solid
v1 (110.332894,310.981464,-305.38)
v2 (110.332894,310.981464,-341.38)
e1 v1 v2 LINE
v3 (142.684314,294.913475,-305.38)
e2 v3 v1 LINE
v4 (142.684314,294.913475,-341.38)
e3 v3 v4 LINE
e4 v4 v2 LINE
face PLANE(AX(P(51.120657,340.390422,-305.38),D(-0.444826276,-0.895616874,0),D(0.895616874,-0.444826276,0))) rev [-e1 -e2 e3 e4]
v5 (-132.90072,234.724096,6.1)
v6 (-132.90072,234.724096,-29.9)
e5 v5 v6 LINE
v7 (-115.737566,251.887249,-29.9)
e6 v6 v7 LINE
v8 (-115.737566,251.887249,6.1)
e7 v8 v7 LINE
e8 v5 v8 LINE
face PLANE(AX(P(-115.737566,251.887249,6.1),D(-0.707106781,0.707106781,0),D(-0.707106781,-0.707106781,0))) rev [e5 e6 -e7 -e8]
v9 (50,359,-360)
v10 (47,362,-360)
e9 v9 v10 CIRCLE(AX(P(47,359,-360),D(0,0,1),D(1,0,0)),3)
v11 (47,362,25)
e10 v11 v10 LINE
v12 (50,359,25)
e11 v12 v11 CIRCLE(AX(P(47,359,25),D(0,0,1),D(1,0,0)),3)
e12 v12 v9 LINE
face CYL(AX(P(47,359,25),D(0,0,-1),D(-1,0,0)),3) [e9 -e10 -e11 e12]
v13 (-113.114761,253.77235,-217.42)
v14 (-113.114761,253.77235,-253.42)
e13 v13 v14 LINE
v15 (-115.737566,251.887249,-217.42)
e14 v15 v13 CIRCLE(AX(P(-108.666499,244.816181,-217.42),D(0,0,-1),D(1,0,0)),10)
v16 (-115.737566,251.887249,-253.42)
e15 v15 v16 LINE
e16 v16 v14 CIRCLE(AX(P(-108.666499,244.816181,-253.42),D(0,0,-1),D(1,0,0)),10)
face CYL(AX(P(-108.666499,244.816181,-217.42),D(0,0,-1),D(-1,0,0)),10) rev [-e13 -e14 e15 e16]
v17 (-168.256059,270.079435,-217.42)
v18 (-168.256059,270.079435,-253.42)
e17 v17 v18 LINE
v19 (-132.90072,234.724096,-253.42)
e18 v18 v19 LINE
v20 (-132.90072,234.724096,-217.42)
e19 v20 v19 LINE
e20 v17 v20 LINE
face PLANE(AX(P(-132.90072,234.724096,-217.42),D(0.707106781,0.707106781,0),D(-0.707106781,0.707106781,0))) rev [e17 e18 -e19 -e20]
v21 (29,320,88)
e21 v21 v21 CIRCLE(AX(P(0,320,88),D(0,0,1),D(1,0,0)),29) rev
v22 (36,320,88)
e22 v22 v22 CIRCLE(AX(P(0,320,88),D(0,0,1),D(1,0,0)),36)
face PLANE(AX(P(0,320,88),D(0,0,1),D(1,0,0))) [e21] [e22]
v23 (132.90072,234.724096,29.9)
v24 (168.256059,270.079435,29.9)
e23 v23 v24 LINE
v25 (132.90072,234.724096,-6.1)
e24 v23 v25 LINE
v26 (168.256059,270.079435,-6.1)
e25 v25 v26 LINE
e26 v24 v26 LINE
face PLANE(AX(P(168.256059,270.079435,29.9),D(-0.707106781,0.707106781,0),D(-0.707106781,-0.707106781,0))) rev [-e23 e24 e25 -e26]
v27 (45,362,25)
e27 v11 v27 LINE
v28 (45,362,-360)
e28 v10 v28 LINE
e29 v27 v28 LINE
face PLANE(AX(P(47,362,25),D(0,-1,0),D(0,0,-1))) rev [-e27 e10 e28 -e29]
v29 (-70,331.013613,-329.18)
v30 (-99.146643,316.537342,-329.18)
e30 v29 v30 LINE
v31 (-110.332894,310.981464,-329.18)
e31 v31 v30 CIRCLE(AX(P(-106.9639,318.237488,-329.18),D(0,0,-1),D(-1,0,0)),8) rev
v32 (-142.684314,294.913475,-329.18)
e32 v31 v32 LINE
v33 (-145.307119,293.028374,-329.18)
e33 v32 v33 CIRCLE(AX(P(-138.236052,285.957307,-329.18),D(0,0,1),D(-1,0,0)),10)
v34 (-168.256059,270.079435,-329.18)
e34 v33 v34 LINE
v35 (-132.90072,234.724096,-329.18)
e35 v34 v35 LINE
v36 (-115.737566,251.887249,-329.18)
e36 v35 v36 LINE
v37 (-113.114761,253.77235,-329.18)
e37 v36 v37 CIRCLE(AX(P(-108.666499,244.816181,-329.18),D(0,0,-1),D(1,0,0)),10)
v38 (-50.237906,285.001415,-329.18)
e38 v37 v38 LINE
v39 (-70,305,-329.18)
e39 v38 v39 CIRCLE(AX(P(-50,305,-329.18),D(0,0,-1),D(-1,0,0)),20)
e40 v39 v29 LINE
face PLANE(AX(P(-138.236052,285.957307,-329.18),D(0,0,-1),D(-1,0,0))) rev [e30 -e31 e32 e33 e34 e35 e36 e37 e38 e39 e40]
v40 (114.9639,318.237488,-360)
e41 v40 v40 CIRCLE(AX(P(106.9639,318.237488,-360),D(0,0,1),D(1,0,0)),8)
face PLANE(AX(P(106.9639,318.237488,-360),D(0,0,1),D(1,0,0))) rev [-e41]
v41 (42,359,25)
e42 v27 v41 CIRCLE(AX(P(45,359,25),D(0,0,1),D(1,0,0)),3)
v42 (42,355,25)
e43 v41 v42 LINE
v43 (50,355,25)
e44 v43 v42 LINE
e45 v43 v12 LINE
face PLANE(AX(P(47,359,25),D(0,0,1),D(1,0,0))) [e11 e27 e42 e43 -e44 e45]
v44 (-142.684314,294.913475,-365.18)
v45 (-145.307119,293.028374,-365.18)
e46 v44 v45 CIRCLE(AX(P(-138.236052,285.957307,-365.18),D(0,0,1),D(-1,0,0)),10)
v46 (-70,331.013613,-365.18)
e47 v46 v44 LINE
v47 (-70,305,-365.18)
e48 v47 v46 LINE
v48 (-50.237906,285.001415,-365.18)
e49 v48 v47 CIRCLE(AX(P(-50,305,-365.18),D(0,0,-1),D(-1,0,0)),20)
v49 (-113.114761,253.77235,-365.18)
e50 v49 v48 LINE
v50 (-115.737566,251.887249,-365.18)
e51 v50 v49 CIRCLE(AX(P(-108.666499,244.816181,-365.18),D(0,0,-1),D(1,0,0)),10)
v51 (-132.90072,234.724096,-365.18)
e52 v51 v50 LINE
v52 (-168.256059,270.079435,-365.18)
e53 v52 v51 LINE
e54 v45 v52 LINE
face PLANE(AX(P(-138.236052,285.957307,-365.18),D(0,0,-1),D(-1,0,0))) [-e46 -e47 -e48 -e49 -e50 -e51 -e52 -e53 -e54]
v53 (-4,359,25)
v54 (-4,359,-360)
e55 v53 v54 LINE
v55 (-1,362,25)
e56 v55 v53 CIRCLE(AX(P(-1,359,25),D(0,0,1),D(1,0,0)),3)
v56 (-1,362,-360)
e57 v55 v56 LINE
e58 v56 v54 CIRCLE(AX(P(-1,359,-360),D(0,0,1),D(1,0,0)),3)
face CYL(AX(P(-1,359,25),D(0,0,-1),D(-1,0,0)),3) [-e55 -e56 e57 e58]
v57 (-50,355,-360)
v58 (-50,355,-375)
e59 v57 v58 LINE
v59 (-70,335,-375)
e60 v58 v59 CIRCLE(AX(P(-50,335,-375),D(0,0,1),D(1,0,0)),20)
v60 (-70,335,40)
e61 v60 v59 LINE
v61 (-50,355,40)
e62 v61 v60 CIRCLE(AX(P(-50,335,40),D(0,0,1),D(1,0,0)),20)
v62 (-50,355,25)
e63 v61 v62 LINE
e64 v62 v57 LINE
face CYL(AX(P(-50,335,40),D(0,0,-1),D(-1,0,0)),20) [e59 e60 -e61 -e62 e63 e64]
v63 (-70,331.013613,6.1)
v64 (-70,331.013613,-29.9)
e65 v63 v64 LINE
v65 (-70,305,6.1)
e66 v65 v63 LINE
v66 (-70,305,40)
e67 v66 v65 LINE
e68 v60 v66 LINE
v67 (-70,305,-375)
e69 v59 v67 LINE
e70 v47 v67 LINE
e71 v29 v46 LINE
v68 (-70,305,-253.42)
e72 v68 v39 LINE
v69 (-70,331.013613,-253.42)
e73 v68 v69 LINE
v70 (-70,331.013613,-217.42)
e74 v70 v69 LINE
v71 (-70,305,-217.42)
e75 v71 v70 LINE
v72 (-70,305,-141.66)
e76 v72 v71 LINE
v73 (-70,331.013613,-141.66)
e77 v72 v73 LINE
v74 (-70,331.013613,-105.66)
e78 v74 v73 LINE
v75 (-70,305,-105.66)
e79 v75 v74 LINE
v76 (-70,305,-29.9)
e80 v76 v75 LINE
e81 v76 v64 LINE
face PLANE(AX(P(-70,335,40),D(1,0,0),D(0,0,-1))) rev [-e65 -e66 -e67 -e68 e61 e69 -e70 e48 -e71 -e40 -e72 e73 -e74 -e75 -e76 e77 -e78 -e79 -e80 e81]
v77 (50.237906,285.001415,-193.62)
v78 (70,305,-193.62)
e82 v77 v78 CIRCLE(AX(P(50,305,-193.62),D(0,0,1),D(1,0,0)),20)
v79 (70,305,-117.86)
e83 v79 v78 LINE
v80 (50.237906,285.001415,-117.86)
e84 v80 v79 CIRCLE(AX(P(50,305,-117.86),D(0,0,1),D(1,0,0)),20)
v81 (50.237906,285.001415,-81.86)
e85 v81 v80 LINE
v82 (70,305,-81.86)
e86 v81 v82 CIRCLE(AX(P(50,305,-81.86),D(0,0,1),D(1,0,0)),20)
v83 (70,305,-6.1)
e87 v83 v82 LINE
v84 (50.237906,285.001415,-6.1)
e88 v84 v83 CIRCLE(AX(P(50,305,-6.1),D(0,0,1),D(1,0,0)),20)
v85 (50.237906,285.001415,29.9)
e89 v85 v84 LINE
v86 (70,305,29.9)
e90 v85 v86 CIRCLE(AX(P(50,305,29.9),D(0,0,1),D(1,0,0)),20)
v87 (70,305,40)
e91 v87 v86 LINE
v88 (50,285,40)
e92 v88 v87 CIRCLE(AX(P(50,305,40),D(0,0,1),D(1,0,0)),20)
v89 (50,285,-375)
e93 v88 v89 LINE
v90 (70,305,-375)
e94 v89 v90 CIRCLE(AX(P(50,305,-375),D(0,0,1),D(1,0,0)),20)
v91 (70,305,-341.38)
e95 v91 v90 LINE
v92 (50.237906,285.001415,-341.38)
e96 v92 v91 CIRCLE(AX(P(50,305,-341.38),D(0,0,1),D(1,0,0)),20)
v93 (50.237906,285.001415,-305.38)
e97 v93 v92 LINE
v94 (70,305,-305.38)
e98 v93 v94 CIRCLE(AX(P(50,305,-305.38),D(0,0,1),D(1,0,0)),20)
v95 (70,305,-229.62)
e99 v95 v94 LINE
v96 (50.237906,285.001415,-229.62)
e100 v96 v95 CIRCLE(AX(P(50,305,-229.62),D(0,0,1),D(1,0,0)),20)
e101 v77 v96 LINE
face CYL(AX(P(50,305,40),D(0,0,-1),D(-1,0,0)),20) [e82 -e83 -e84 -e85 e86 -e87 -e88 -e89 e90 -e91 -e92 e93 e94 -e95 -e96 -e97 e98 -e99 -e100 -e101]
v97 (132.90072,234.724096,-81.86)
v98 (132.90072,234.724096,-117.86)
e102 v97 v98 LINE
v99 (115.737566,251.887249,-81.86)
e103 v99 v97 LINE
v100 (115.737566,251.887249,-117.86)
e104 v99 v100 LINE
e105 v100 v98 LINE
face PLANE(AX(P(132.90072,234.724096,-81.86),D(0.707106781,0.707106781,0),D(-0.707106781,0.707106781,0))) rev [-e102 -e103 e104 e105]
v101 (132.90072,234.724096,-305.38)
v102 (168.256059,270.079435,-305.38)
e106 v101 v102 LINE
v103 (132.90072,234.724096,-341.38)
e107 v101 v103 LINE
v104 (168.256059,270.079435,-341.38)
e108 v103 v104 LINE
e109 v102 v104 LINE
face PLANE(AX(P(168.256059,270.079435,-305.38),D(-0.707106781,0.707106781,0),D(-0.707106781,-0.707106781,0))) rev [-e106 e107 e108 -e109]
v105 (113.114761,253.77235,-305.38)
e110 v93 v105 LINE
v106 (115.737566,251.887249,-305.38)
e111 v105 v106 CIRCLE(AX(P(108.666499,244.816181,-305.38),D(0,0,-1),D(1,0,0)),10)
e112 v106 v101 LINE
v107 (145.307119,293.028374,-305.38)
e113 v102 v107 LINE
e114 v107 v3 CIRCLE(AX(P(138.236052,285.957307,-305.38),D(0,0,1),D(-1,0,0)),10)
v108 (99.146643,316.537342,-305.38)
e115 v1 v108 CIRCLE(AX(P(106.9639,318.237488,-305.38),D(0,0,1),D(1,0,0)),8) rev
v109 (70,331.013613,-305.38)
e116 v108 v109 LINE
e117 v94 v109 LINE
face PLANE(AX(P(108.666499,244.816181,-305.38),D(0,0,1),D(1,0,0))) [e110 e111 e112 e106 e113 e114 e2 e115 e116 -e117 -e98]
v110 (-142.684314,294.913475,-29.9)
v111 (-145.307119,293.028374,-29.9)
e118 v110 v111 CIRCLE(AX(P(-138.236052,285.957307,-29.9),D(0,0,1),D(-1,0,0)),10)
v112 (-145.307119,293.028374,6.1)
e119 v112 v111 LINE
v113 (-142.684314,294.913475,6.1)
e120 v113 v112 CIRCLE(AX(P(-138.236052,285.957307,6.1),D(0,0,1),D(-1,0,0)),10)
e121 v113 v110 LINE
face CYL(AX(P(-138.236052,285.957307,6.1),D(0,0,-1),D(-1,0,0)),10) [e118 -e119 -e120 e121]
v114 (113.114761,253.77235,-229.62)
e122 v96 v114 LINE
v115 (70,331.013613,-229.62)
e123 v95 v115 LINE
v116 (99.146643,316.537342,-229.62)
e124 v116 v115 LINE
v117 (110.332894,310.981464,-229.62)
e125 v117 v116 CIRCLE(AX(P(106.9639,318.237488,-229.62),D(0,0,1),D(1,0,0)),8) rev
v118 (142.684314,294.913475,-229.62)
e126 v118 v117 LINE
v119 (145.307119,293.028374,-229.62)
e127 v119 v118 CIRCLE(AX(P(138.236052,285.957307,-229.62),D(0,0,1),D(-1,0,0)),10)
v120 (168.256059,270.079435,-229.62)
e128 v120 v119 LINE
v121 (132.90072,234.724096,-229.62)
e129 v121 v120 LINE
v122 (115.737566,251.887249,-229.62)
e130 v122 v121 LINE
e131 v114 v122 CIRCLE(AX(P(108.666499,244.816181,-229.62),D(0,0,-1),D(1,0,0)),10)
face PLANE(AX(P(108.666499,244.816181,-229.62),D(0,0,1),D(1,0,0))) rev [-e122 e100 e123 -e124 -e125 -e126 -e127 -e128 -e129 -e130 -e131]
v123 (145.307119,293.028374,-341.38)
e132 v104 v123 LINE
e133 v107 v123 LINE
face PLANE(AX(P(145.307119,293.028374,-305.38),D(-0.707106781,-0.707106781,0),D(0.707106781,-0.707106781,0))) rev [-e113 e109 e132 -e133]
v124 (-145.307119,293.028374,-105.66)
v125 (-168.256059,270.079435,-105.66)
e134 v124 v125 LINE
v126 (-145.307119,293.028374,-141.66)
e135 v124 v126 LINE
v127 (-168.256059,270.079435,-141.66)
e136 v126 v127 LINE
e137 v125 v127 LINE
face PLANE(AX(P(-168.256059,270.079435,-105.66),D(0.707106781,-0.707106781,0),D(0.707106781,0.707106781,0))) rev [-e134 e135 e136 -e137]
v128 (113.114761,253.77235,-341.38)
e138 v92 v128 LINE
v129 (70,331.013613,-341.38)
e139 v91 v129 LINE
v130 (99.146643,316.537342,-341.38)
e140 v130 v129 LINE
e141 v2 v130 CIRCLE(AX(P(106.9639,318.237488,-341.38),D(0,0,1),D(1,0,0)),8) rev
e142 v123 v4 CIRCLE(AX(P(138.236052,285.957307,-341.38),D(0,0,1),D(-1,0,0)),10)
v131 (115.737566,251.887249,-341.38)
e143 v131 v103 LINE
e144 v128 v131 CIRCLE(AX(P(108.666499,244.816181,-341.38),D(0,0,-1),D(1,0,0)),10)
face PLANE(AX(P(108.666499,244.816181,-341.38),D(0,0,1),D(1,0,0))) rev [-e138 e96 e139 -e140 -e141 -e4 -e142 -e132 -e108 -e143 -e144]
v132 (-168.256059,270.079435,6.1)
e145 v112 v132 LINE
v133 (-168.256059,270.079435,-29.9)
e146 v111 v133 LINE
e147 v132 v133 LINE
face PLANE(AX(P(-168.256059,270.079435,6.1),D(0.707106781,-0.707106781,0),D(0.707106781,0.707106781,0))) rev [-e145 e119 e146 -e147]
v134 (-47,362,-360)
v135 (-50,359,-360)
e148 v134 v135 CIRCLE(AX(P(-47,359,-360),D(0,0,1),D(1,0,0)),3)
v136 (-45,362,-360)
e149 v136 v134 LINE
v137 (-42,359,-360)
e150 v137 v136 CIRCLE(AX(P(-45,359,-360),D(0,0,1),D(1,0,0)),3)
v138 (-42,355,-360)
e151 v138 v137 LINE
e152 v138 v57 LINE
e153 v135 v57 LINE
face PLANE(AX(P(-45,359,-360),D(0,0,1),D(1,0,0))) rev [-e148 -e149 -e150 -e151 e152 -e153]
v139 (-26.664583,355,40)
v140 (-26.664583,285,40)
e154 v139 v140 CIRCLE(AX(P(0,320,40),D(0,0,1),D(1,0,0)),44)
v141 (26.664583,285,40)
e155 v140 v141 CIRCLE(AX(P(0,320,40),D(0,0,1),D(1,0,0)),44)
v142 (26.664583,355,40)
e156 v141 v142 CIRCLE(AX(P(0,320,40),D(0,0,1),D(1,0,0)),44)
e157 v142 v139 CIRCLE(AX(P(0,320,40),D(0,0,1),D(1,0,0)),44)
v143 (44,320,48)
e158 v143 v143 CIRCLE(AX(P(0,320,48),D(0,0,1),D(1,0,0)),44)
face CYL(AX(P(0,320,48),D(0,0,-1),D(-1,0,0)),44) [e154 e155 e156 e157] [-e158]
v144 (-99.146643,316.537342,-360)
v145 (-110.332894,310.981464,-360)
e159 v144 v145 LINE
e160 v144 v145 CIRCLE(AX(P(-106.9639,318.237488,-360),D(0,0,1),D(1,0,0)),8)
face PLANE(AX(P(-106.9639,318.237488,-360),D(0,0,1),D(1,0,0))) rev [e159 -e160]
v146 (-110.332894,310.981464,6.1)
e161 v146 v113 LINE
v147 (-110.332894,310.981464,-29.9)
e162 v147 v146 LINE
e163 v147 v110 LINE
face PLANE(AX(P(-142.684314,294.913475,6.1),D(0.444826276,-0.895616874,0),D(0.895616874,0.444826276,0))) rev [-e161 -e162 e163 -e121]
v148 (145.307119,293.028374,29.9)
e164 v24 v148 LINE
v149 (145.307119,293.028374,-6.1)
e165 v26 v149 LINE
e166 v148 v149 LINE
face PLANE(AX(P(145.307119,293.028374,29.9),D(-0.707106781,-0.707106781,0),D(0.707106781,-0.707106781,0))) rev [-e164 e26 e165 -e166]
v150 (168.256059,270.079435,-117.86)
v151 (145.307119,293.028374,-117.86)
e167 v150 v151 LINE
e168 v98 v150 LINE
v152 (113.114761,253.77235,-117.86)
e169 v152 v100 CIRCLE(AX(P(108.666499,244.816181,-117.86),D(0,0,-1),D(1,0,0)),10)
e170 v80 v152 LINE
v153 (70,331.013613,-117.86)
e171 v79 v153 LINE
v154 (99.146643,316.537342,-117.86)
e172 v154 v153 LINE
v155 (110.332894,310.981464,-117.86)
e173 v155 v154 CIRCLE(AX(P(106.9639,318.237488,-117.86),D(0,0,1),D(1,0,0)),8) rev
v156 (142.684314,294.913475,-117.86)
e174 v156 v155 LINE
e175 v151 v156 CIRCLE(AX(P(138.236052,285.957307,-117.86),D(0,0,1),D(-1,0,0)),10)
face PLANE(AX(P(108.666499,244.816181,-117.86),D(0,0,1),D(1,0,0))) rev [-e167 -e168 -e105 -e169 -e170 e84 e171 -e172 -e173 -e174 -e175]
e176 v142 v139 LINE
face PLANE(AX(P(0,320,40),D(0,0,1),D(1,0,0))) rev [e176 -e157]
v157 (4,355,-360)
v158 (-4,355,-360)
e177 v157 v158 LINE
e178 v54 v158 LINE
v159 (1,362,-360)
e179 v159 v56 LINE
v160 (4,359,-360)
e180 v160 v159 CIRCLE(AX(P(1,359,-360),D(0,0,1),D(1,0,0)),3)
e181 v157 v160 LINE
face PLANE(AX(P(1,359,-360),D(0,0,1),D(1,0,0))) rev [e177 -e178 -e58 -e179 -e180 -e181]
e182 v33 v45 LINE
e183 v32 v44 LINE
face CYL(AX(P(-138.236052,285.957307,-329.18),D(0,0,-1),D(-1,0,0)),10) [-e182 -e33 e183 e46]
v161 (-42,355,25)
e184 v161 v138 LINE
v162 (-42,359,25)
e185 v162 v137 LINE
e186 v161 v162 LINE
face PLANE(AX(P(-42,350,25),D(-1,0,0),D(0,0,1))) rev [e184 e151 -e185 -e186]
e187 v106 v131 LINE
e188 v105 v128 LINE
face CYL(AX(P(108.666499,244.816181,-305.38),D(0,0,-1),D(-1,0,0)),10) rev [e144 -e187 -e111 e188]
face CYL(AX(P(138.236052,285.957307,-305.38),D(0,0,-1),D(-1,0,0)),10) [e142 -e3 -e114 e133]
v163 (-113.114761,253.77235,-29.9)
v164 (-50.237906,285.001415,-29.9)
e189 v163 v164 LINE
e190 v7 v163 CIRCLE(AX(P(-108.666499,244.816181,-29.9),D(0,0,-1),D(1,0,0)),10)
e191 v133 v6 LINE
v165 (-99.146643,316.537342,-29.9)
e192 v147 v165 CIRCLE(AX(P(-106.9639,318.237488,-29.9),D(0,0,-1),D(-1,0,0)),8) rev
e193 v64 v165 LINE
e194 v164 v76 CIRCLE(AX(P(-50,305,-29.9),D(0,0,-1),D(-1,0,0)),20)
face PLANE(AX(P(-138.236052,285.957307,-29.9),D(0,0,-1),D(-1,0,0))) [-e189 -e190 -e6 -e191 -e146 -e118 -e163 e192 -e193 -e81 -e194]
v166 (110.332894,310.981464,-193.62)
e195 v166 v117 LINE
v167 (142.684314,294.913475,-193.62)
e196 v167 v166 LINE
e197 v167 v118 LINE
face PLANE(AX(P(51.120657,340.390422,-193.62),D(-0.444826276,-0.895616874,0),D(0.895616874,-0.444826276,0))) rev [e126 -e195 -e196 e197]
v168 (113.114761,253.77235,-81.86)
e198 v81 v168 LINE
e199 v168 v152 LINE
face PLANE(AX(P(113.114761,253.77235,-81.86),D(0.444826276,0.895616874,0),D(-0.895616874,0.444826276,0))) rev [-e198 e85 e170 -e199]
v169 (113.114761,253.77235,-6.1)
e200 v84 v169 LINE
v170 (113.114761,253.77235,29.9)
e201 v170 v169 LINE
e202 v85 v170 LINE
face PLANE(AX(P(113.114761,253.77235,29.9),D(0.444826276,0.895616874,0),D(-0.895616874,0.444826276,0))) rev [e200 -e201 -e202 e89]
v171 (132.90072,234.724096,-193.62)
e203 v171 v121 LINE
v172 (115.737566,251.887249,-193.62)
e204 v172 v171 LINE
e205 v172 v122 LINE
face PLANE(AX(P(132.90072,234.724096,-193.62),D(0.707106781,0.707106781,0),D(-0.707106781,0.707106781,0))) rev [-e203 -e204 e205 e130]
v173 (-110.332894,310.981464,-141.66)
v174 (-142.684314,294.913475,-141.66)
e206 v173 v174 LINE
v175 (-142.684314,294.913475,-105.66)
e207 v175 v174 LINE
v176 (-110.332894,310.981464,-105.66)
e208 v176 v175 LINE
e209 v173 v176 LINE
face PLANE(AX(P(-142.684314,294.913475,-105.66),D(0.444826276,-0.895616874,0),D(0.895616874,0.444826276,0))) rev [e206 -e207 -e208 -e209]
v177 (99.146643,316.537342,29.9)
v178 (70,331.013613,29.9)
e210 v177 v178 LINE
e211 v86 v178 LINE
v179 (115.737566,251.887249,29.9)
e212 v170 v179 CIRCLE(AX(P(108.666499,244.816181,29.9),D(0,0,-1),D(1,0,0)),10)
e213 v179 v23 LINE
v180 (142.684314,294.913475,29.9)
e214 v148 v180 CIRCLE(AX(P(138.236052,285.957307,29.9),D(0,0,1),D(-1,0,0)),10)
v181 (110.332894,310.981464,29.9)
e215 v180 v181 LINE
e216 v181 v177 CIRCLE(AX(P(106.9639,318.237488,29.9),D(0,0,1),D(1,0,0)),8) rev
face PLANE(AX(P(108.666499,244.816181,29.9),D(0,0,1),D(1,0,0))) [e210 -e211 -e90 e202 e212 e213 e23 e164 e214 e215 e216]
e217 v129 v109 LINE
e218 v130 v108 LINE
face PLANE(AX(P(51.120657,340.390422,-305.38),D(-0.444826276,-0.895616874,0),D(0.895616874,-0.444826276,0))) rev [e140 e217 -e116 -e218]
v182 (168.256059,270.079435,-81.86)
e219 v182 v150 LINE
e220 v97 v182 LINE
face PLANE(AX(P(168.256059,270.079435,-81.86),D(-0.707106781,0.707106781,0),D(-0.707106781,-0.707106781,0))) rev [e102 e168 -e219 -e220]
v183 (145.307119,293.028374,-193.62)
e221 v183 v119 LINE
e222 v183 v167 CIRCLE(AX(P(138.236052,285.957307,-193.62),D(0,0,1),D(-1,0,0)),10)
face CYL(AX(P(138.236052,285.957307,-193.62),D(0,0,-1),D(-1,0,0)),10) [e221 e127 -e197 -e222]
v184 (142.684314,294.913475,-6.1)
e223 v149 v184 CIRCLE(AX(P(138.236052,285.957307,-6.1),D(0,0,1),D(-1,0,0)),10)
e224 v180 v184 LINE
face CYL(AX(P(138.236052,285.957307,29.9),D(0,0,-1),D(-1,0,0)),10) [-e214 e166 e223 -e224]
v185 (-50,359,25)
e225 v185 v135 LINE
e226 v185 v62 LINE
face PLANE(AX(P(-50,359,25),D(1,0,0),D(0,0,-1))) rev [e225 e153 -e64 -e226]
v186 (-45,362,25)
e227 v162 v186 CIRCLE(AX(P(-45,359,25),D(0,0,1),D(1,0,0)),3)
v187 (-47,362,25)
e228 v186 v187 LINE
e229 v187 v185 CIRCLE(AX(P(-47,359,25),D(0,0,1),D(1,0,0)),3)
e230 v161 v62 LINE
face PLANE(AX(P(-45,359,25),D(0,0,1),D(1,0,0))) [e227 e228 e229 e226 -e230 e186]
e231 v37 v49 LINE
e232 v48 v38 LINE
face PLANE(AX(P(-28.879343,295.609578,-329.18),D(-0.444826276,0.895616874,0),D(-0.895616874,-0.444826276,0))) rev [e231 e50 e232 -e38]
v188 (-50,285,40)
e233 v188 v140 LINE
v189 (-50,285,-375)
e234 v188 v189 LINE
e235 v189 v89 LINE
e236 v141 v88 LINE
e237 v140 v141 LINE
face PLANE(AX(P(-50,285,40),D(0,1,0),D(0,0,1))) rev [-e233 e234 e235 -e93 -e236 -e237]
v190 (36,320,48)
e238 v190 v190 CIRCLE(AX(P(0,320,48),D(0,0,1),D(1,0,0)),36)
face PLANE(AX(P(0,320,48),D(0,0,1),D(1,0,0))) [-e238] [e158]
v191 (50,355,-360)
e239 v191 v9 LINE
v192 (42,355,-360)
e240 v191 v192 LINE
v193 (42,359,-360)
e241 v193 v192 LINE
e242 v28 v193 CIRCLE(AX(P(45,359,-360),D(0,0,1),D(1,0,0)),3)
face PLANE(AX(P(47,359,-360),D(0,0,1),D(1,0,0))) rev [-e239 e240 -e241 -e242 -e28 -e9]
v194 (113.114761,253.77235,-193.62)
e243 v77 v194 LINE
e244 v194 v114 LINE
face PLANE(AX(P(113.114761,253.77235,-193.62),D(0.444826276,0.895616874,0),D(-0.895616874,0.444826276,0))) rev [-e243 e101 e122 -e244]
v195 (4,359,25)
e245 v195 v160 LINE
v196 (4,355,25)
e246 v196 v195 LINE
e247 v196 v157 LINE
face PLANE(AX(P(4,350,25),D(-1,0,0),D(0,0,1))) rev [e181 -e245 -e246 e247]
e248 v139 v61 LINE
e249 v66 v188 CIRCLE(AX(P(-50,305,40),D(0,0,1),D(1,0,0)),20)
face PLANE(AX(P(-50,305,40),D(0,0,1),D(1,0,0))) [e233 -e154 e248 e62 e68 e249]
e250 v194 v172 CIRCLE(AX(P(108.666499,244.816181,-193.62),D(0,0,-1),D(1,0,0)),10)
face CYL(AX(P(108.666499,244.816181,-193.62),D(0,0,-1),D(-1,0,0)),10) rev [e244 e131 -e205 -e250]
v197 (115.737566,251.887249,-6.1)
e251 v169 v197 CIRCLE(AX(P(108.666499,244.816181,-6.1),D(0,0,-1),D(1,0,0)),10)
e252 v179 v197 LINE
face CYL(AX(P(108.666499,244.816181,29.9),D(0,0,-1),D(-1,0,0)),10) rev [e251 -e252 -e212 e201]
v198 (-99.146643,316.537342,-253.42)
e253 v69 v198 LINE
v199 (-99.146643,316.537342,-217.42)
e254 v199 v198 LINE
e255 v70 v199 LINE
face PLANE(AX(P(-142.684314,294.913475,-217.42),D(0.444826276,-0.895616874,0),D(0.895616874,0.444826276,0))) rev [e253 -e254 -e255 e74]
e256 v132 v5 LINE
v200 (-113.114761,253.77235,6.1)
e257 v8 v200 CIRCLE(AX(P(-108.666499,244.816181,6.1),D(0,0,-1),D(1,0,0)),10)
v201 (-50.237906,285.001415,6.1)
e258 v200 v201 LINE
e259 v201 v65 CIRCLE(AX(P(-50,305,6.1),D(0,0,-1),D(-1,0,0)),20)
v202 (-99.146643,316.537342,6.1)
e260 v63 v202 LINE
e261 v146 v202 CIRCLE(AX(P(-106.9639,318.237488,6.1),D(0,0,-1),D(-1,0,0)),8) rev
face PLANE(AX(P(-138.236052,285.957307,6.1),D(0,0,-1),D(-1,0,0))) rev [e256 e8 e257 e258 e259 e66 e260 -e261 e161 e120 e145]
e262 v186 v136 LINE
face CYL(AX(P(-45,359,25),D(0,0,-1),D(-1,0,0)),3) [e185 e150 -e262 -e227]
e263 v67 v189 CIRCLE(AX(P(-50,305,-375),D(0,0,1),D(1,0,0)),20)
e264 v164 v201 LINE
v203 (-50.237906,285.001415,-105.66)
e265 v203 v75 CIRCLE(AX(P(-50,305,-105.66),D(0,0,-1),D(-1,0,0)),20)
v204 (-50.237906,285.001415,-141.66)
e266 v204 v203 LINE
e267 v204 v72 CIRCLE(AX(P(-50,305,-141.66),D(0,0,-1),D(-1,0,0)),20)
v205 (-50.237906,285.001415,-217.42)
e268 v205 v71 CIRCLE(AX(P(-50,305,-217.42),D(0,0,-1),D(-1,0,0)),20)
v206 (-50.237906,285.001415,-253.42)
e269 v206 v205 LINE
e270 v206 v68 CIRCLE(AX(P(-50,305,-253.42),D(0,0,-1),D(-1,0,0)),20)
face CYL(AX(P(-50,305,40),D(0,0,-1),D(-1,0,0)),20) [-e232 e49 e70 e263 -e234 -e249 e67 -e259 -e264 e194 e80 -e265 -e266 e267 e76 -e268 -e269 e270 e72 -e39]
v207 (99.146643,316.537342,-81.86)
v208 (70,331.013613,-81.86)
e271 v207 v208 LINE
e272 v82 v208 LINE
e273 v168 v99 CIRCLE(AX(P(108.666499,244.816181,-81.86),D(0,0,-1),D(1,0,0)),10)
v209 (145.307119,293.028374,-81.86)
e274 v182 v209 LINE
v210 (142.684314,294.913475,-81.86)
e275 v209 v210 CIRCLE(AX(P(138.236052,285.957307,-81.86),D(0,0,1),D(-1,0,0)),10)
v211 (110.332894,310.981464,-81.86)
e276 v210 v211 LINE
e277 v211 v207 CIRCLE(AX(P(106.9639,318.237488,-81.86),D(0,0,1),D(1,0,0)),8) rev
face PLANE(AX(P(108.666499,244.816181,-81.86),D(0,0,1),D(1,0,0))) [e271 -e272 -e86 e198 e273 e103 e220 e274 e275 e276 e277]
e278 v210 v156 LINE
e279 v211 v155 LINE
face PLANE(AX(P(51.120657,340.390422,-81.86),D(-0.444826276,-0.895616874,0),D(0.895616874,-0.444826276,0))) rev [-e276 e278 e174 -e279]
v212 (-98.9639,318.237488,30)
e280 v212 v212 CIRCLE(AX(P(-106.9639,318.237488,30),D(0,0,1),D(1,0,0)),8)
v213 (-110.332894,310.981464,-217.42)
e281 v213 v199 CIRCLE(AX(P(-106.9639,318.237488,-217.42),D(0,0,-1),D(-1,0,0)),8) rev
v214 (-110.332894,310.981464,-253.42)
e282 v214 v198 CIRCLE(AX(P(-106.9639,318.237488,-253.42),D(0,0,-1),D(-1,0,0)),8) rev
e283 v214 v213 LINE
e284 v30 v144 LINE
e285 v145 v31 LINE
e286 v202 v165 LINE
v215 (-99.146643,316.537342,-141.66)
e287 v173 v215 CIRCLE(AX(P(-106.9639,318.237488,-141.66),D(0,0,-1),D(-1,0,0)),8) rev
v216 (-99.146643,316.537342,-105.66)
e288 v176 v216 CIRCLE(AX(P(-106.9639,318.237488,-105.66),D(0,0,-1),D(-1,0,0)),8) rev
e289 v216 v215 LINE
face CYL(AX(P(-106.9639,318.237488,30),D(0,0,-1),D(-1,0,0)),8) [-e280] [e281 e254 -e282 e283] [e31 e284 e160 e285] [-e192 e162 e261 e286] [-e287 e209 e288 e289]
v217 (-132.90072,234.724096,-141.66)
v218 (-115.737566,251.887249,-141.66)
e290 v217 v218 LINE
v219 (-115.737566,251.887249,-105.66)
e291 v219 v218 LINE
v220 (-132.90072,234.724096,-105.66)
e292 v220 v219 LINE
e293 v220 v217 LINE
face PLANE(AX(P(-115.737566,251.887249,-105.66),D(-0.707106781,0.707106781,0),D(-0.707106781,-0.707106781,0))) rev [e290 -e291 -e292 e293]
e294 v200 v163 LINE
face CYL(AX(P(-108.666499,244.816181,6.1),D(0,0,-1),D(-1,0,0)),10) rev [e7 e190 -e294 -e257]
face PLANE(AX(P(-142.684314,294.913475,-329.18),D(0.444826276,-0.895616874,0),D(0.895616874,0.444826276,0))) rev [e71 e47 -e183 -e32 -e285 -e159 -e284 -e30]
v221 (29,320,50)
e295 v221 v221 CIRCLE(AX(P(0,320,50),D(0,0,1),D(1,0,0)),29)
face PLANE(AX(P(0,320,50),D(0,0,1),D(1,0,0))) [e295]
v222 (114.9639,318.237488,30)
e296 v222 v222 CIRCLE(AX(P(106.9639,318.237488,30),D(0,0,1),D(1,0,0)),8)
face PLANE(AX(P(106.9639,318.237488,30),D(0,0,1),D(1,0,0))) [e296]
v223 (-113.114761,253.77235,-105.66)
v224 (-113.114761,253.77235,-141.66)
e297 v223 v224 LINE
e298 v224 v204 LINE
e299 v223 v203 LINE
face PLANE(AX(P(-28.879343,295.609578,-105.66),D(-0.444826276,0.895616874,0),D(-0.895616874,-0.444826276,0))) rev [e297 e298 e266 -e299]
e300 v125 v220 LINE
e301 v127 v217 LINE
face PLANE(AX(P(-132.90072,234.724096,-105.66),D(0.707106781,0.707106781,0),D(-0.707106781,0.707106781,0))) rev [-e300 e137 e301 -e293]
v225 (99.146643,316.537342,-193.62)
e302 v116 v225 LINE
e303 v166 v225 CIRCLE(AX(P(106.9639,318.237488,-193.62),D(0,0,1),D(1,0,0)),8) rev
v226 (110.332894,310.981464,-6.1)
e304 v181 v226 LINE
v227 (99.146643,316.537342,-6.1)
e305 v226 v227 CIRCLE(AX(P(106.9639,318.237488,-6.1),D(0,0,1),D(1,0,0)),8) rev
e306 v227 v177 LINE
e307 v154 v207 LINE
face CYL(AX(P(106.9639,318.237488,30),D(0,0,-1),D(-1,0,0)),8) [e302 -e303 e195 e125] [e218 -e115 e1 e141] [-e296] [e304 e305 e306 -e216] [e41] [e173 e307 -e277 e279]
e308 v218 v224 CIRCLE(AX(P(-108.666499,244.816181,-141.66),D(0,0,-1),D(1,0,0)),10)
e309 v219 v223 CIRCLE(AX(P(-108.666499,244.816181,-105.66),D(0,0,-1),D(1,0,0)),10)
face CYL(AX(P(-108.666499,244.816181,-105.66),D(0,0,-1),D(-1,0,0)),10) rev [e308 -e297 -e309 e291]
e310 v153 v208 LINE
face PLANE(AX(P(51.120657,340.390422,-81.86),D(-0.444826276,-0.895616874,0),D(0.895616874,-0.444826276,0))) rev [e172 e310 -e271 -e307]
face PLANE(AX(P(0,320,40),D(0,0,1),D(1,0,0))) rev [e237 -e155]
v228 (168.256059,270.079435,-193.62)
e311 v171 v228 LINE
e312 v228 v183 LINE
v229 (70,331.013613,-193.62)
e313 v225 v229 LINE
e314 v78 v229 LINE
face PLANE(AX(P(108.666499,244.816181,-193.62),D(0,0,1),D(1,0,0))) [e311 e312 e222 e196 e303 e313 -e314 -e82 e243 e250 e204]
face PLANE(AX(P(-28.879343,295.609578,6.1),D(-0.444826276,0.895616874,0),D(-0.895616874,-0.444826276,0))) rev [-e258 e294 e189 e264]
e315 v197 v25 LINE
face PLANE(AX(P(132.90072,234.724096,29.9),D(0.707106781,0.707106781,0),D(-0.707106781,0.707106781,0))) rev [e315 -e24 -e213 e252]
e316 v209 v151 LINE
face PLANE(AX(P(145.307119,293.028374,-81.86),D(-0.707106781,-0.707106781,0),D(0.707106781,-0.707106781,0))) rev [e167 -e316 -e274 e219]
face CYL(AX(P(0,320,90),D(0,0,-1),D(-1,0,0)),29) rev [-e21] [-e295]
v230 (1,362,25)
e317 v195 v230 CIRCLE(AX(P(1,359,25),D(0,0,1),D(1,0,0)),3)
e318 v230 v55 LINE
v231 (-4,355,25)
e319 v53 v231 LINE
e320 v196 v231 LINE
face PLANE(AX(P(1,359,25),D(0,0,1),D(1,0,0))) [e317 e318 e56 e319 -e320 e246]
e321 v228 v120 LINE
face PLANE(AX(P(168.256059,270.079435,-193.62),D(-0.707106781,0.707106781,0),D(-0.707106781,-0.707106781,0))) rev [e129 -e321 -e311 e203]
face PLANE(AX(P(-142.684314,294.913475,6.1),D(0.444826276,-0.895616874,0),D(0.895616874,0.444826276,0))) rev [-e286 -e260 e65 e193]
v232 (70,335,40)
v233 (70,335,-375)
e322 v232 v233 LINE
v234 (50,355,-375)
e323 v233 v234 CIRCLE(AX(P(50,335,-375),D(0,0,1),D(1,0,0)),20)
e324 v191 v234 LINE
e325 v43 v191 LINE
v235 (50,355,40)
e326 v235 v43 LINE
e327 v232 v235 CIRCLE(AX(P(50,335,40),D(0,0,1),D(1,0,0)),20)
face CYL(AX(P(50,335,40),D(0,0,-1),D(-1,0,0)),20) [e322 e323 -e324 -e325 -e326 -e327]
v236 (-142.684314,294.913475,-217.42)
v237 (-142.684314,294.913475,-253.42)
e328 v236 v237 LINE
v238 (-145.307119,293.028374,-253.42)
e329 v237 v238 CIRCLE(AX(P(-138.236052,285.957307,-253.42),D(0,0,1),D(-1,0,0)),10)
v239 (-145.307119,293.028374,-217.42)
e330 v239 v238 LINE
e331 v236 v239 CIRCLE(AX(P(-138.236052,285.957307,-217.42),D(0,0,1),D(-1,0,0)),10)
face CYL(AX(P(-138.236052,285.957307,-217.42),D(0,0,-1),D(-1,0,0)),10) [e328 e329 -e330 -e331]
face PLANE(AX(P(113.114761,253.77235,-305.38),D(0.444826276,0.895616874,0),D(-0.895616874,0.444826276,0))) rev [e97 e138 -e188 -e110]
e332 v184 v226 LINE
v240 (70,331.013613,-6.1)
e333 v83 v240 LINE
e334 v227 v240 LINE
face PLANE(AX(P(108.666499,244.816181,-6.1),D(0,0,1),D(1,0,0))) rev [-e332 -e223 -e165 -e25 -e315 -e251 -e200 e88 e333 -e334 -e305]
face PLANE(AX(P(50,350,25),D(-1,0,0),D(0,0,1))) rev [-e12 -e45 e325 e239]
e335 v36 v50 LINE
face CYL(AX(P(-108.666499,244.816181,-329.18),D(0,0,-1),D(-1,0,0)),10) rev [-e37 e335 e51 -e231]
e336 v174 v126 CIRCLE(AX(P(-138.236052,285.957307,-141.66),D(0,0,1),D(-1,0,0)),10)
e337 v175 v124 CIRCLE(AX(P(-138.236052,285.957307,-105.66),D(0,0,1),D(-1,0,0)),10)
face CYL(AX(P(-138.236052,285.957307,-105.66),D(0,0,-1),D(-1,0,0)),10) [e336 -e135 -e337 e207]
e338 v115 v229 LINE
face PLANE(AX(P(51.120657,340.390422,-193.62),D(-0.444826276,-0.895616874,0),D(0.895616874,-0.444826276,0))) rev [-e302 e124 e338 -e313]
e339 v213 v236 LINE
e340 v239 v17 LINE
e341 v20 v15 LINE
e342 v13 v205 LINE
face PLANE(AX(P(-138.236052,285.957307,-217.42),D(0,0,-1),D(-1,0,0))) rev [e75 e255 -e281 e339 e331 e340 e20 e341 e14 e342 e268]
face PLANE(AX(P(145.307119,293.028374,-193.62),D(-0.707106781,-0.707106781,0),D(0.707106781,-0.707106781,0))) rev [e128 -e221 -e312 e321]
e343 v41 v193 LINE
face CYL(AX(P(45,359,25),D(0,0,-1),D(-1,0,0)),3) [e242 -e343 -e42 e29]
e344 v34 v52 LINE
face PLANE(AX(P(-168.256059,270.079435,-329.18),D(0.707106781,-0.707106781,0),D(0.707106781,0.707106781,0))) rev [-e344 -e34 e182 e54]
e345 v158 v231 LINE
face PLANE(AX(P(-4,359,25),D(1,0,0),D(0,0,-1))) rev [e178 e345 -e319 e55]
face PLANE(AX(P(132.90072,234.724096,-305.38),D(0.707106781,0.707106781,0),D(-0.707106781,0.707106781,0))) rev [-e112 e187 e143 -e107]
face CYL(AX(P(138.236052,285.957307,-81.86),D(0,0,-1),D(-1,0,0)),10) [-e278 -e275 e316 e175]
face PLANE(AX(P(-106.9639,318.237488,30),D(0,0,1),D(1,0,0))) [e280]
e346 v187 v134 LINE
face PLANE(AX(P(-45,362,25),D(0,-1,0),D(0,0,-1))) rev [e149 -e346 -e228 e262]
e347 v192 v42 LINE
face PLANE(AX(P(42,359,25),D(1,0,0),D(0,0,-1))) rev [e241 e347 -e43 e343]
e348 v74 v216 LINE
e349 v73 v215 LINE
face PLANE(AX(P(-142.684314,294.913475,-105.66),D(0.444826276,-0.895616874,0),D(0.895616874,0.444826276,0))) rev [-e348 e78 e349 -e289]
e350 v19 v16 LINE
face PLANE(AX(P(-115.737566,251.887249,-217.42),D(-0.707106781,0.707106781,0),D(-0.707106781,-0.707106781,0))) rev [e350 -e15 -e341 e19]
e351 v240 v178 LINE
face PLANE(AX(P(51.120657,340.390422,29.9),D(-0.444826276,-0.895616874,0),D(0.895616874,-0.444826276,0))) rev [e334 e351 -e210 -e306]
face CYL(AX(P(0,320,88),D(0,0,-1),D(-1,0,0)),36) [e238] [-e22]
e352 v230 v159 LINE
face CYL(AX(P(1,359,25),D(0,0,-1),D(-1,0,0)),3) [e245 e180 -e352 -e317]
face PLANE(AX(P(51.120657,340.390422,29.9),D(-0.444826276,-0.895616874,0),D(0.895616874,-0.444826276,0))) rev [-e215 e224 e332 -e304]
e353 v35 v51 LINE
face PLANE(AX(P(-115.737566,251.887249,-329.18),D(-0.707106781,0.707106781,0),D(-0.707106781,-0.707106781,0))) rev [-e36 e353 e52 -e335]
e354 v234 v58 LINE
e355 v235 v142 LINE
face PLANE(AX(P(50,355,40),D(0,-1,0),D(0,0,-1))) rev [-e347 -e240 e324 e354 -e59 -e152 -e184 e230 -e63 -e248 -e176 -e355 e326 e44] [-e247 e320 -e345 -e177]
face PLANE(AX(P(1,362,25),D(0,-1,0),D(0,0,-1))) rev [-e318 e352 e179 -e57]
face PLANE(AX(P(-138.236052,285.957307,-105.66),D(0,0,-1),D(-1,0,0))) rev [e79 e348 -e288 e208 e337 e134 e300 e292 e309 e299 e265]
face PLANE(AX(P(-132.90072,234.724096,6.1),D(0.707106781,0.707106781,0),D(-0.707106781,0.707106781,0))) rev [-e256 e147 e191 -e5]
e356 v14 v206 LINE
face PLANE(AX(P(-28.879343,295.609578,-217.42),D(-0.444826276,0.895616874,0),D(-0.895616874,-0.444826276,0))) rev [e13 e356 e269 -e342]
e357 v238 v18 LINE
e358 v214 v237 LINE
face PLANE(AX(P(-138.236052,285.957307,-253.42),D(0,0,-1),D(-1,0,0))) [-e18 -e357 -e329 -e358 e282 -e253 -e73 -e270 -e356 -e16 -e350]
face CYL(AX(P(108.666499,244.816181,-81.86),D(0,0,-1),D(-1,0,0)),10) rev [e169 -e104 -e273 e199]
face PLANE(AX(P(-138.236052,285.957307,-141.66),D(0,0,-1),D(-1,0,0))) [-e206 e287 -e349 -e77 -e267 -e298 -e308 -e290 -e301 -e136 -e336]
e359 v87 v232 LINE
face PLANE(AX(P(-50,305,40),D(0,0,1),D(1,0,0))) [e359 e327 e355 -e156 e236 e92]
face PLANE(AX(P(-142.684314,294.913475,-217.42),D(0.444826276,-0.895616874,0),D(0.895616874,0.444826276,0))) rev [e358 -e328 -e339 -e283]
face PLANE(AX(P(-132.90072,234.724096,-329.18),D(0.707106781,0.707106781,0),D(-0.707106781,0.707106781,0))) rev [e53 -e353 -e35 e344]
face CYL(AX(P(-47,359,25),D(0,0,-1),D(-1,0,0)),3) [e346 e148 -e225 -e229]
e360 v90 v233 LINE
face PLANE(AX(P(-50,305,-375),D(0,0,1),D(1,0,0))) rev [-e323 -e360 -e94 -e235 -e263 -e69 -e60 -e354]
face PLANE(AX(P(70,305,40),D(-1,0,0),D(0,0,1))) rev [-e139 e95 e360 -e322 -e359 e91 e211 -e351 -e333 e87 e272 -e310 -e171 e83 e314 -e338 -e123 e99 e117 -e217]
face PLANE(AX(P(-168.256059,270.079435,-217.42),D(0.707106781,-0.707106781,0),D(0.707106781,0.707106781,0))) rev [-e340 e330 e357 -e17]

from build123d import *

# Parameters (mm, degrees)
PLENUM_START          = -375
PLENUM_DEPTH          = 415
PLENUM_START_2        = -360
PLENUM_RIBS_DEPTH     = 385
RUNNER_START          = -6.1
RUNNER_1_DEPTH        = 36
RUNNER_START_2        = -29.9
RUNNER_2_DEPTH        = 36
RUNNER_START_3        = -117.86
RUNNER_3_DEPTH        = 36
RUNNER_START_4        = -141.66
RUNNER_4_DEPTH        = 36
RUNNER_START_5        = -229.62
RUNNER_5_DEPTH        = 36
RUNNER_START_6        = -253.42
RUNNER_6_DEPTH        = 36
RUNNER_START_7        = -341.38
RUNNER_7_DEPTH        = 36
RUNNER_START_8        = -365.18
RUNNER_8_DEPTH        = 36
THROTTLE_START        = 40
SKETCH11_R            = 44
THROTTLE_FLANGE_DEPTH = 8
THROTTLE_START_2      = 48
SKETCH12_R            = 36
THROTTLE_BODY_DEPTH   = 40
THROTTLE_START_3      = 50
SKETCH13_R            = 29
THROTTLE_BORE_DEPTH   = 40
FUEL_START            = -360
SKETCH14_R            = 8
FUEL_RAILS_DEPTH      = 390


with BuildPart() as part:
    # Sketch1 → Plenum (new body)
    with BuildSketch(Plane.XY.offset(PLENUM_START)):
        with BuildLine():
            Line((-50, 285), (50, 285))
            ThreePointArc((50, 285), (64.142135624, 290.857864376), (70, 305))
            Line((70, 305), (70, 335))
            ThreePointArc((70, 335), (64.142135624, 349.142135624), (50, 355))
            Line((50, 355), (-50, 355))
            ThreePointArc((-50, 355), (-64.142135624, 349.142135624), (-70, 335))
            Line((-70, 335), (-70, 305))
            ThreePointArc((-70, 305), (-64.142135624, 290.857864376), (-50, 285))
        make_face()
    extrude(amount=PLENUM_DEPTH)

    # Sketch2 → Plenum Ribs (add)
    with BuildSketch(Plane.XY.offset(PLENUM_START_2)):
        with BuildLine():
            Line((-50, 350), (-42, 350))
            Line((-42, 350), (-42, 359))
            ThreePointArc((-42, 359), (-42.878679656, 361.121320344), (-45, 362))
            Line((-45, 362), (-47, 362))
            ThreePointArc((-47, 362), (-49.121320344, 361.121320344), (-50, 359))
            Line((-50, 359), (-50, 350))
        make_face()
        with BuildLine():
            Line((-4, 350), (4, 350))
            Line((4, 350), (4, 359))
            ThreePointArc((4, 359), (3.121320344, 361.121320344), (1, 362))
            Line((1, 362), (-1, 362))
            ThreePointArc((-1, 362), (-3.121320344, 361.121320344), (-4, 359))
            Line((-4, 359), (-4, 350))
        make_face()
        with BuildLine():
            Line((42, 350), (50, 350))
            Line((50, 350), (50, 359))
            ThreePointArc((50, 359), (49.121320344, 361.121320344), (47, 362))
            Line((47, 362), (45, 362))
            ThreePointArc((45, 362), (42.878679656, 361.121320344), (42, 359))
            Line((42, 359), (42, 350))
        make_face()
    extrude(amount=PLENUM_RIBS_DEPTH)

    # Sketch3 → Runner 1 (add)
    with BuildSketch(Plane.XY.offset(RUNNER_START)):
        with BuildLine():
            Line((132.900719524, 234.724096015), (115.737566336, 251.887249203))
            ThreePointArc((115.737566336, 251.887249203), (114.502776925, 252.936394099), (113.114761283, 253.772350127))
            Line((113.114761283, 253.772350127), (28.879343102, 295.60957816))
            Line((28.879343102, 295.60957816), (51.120656898, 340.39042184))
            Line((51.120656898, 340.39042184), (142.684314275, 294.913475254))
            ThreePointArc((142.684314275, 294.913475254), (144.072329917, 294.077519226), (145.307119327, 293.02837433))
            Line((145.307119327, 293.02837433), (168.256058583, 270.079435074))
            Line((168.256058583, 270.079435074), (132.900719524, 234.724096015))
        make_face()
    extrude(amount=RUNNER_1_DEPTH)

    # Sketch4 → Runner 2 (add)
    with BuildSketch(Plane.XY.offset(RUNNER_START_2)):
        with BuildLine():
            Line((-168.256058583, 270.079435074), (-145.307119327, 293.02837433))
            ThreePointArc((-145.307119327, 293.02837433), (-144.072329917, 294.077519226), (-142.684314275, 294.913475254))
            Line((-142.684314275, 294.913475254), (-51.120656898, 340.39042184))
            Line((-51.120656898, 340.39042184), (-28.879343102, 295.60957816))
            Line((-28.879343102, 295.60957816), (-113.114761283, 253.772350127))
            ThreePointArc((-113.114761283, 253.772350127), (-114.502776925, 252.936394099), (-115.737566336, 251.887249203))
            Line((-115.737566336, 251.887249203), (-132.900719524, 234.724096015))
            Line((-132.900719524, 234.724096015), (-168.256058583, 270.079435074))
        make_face()
    extrude(amount=RUNNER_2_DEPTH)

    # Sketch5 → Runner 3 (add)
    with BuildSketch(Plane.XY.offset(RUNNER_START_3)):
        with BuildLine():
            Line((132.900719524, 234.724096015), (115.737566336, 251.887249203))
            ThreePointArc((115.737566336, 251.887249203), (114.502776925, 252.936394099), (113.114761283, 253.772350127))
            Line((113.114761283, 253.772350127), (28.879343102, 295.60957816))
            Line((28.879343102, 295.60957816), (51.120656898, 340.39042184))
            Line((51.120656898, 340.39042184), (142.684314275, 294.913475254))
            ThreePointArc((142.684314275, 294.913475254), (144.072329917, 294.077519226), (145.307119327, 293.02837433))
            Line((145.307119327, 293.02837433), (168.256058583, 270.079435074))
            Line((168.256058583, 270.079435074), (132.900719524, 234.724096015))
        make_face()
    extrude(amount=RUNNER_3_DEPTH)

    # Sketch6 → Runner 4 (add)
    with BuildSketch(Plane.XY.offset(RUNNER_START_4)):
        with BuildLine():
            Line((-168.256058583, 270.079435074), (-145.307119327, 293.02837433))
            ThreePointArc((-145.307119327, 293.02837433), (-144.072329917, 294.077519226), (-142.684314275, 294.913475254))
            Line((-142.684314275, 294.913475254), (-51.120656898, 340.39042184))
            Line((-51.120656898, 340.39042184), (-28.879343102, 295.60957816))
            Line((-28.879343102, 295.60957816), (-113.114761283, 253.772350127))
            ThreePointArc((-113.114761283, 253.772350127), (-114.502776925, 252.936394099), (-115.737566336, 251.887249203))
            Line((-115.737566336, 251.887249203), (-132.900719524, 234.724096015))
            Line((-132.900719524, 234.724096015), (-168.256058583, 270.079435074))
        make_face()
    extrude(amount=RUNNER_4_DEPTH)

    # Sketch7 → Runner 5 (add)
    with BuildSketch(Plane.XY.offset(RUNNER_START_5)):
        with BuildLine():
            Line((132.900719524, 234.724096015), (115.737566336, 251.887249203))
            ThreePointArc((115.737566336, 251.887249203), (114.502776925, 252.936394099), (113.114761283, 253.772350127))
            Line((113.114761283, 253.772350127), (28.879343102, 295.60957816))
            Line((28.879343102, 295.60957816), (51.120656898, 340.39042184))
            Line((51.120656898, 340.39042184), (142.684314275, 294.913475254))
            ThreePointArc((142.684314275, 294.913475254), (144.072329917, 294.077519226), (145.307119327, 293.02837433))
            Line((145.307119327, 293.02837433), (168.256058583, 270.079435074))
            Line((168.256058583, 270.079435074), (132.900719524, 234.724096015))
        make_face()
    extrude(amount=RUNNER_5_DEPTH)

    # Sketch8 → Runner 6 (add)
    with BuildSketch(Plane.XY.offset(RUNNER_START_6)):
        with BuildLine():
            Line((-168.256058583, 270.079435074), (-145.307119327, 293.02837433))
            ThreePointArc((-145.307119327, 293.02837433), (-144.072329917, 294.077519226), (-142.684314275, 294.913475254))
            Line((-142.684314275, 294.913475254), (-51.120656898, 340.39042184))
            Line((-51.120656898, 340.39042184), (-28.879343102, 295.60957816))
            Line((-28.879343102, 295.60957816), (-113.114761283, 253.772350127))
            ThreePointArc((-113.114761283, 253.772350127), (-114.502776925, 252.936394099), (-115.737566336, 251.887249203))
            Line((-115.737566336, 251.887249203), (-132.900719524, 234.724096015))
            Line((-132.900719524, 234.724096015), (-168.256058583, 270.079435074))
        make_face()
    extrude(amount=RUNNER_6_DEPTH)

    # Sketch9 → Runner 7 (add)
    with BuildSketch(Plane.XY.offset(RUNNER_START_7)):
        with BuildLine():
            Line((132.900719524, 234.724096015), (115.737566336, 251.887249203))
            ThreePointArc((115.737566336, 251.887249203), (114.502776925, 252.936394099), (113.114761283, 253.772350127))
            Line((113.114761283, 253.772350127), (28.879343102, 295.60957816))
            Line((28.879343102, 295.60957816), (51.120656898, 340.39042184))
            Line((51.120656898, 340.39042184), (142.684314275, 294.913475254))
            ThreePointArc((142.684314275, 294.913475254), (144.072329917, 294.077519226), (145.307119327, 293.02837433))
            Line((145.307119327, 293.02837433), (168.256058583, 270.079435074))
            Line((168.256058583, 270.079435074), (132.900719524, 234.724096015))
        make_face()
    extrude(amount=RUNNER_7_DEPTH)

    # Sketch10 → Runner 8 (add)
    with BuildSketch(Plane.XY.offset(RUNNER_START_8)):
        with BuildLine():
            Line((-168.256058583, 270.079435074), (-145.307119327, 293.02837433))
            ThreePointArc((-145.307119327, 293.02837433), (-144.072329917, 294.077519226), (-142.684314275, 294.913475254))
            Line((-142.684314275, 294.913475254), (-51.120656898, 340.39042184))
            Line((-51.120656898, 340.39042184), (-28.879343102, 295.60957816))
            Line((-28.879343102, 295.60957816), (-113.114761283, 253.772350127))
            ThreePointArc((-113.114761283, 253.772350127), (-114.502776925, 252.936394099), (-115.737566336, 251.887249203))
            Line((-115.737566336, 251.887249203), (-132.900719524, 234.724096015))
            Line((-132.900719524, 234.724096015), (-168.256058583, 270.079435074))
        make_face()
    extrude(amount=RUNNER_8_DEPTH)

    # Sketch11 → Throttle Flange (add)
    with BuildSketch(Plane.XY.offset(THROTTLE_START)):
        with Locations((0, 320)):
            Circle(SKETCH11_R)
    extrude(amount=THROTTLE_FLANGE_DEPTH)

    # Sketch12 → Throttle Body (add)
    with BuildSketch(Plane.XY.offset(THROTTLE_START_2)):
        with Locations((0, 320)):
            Circle(SKETCH12_R)
    extrude(amount=THROTTLE_BODY_DEPTH)

    # Sketch13 → Throttle Bore (cut)
    with BuildSketch(Plane.XY.offset(THROTTLE_START_3)):
        with Locations((0, 320)):
            Circle(SKETCH13_R)
    extrude(amount=THROTTLE_BORE_DEPTH, mode=Mode.SUBTRACT)

    # Sketch14 → Fuel Rails (add)
    with BuildSketch(Plane.XY.offset(FUEL_START)):
        with Locations((106.963899649, 318.237487596)):
            Circle(SKETCH14_R)
        with Locations((-106.963899649, 318.237487596)):
            Circle(SKETCH14_R)
    extrude(amount=FUEL_RAILS_DEPTH)


solid = part.part
